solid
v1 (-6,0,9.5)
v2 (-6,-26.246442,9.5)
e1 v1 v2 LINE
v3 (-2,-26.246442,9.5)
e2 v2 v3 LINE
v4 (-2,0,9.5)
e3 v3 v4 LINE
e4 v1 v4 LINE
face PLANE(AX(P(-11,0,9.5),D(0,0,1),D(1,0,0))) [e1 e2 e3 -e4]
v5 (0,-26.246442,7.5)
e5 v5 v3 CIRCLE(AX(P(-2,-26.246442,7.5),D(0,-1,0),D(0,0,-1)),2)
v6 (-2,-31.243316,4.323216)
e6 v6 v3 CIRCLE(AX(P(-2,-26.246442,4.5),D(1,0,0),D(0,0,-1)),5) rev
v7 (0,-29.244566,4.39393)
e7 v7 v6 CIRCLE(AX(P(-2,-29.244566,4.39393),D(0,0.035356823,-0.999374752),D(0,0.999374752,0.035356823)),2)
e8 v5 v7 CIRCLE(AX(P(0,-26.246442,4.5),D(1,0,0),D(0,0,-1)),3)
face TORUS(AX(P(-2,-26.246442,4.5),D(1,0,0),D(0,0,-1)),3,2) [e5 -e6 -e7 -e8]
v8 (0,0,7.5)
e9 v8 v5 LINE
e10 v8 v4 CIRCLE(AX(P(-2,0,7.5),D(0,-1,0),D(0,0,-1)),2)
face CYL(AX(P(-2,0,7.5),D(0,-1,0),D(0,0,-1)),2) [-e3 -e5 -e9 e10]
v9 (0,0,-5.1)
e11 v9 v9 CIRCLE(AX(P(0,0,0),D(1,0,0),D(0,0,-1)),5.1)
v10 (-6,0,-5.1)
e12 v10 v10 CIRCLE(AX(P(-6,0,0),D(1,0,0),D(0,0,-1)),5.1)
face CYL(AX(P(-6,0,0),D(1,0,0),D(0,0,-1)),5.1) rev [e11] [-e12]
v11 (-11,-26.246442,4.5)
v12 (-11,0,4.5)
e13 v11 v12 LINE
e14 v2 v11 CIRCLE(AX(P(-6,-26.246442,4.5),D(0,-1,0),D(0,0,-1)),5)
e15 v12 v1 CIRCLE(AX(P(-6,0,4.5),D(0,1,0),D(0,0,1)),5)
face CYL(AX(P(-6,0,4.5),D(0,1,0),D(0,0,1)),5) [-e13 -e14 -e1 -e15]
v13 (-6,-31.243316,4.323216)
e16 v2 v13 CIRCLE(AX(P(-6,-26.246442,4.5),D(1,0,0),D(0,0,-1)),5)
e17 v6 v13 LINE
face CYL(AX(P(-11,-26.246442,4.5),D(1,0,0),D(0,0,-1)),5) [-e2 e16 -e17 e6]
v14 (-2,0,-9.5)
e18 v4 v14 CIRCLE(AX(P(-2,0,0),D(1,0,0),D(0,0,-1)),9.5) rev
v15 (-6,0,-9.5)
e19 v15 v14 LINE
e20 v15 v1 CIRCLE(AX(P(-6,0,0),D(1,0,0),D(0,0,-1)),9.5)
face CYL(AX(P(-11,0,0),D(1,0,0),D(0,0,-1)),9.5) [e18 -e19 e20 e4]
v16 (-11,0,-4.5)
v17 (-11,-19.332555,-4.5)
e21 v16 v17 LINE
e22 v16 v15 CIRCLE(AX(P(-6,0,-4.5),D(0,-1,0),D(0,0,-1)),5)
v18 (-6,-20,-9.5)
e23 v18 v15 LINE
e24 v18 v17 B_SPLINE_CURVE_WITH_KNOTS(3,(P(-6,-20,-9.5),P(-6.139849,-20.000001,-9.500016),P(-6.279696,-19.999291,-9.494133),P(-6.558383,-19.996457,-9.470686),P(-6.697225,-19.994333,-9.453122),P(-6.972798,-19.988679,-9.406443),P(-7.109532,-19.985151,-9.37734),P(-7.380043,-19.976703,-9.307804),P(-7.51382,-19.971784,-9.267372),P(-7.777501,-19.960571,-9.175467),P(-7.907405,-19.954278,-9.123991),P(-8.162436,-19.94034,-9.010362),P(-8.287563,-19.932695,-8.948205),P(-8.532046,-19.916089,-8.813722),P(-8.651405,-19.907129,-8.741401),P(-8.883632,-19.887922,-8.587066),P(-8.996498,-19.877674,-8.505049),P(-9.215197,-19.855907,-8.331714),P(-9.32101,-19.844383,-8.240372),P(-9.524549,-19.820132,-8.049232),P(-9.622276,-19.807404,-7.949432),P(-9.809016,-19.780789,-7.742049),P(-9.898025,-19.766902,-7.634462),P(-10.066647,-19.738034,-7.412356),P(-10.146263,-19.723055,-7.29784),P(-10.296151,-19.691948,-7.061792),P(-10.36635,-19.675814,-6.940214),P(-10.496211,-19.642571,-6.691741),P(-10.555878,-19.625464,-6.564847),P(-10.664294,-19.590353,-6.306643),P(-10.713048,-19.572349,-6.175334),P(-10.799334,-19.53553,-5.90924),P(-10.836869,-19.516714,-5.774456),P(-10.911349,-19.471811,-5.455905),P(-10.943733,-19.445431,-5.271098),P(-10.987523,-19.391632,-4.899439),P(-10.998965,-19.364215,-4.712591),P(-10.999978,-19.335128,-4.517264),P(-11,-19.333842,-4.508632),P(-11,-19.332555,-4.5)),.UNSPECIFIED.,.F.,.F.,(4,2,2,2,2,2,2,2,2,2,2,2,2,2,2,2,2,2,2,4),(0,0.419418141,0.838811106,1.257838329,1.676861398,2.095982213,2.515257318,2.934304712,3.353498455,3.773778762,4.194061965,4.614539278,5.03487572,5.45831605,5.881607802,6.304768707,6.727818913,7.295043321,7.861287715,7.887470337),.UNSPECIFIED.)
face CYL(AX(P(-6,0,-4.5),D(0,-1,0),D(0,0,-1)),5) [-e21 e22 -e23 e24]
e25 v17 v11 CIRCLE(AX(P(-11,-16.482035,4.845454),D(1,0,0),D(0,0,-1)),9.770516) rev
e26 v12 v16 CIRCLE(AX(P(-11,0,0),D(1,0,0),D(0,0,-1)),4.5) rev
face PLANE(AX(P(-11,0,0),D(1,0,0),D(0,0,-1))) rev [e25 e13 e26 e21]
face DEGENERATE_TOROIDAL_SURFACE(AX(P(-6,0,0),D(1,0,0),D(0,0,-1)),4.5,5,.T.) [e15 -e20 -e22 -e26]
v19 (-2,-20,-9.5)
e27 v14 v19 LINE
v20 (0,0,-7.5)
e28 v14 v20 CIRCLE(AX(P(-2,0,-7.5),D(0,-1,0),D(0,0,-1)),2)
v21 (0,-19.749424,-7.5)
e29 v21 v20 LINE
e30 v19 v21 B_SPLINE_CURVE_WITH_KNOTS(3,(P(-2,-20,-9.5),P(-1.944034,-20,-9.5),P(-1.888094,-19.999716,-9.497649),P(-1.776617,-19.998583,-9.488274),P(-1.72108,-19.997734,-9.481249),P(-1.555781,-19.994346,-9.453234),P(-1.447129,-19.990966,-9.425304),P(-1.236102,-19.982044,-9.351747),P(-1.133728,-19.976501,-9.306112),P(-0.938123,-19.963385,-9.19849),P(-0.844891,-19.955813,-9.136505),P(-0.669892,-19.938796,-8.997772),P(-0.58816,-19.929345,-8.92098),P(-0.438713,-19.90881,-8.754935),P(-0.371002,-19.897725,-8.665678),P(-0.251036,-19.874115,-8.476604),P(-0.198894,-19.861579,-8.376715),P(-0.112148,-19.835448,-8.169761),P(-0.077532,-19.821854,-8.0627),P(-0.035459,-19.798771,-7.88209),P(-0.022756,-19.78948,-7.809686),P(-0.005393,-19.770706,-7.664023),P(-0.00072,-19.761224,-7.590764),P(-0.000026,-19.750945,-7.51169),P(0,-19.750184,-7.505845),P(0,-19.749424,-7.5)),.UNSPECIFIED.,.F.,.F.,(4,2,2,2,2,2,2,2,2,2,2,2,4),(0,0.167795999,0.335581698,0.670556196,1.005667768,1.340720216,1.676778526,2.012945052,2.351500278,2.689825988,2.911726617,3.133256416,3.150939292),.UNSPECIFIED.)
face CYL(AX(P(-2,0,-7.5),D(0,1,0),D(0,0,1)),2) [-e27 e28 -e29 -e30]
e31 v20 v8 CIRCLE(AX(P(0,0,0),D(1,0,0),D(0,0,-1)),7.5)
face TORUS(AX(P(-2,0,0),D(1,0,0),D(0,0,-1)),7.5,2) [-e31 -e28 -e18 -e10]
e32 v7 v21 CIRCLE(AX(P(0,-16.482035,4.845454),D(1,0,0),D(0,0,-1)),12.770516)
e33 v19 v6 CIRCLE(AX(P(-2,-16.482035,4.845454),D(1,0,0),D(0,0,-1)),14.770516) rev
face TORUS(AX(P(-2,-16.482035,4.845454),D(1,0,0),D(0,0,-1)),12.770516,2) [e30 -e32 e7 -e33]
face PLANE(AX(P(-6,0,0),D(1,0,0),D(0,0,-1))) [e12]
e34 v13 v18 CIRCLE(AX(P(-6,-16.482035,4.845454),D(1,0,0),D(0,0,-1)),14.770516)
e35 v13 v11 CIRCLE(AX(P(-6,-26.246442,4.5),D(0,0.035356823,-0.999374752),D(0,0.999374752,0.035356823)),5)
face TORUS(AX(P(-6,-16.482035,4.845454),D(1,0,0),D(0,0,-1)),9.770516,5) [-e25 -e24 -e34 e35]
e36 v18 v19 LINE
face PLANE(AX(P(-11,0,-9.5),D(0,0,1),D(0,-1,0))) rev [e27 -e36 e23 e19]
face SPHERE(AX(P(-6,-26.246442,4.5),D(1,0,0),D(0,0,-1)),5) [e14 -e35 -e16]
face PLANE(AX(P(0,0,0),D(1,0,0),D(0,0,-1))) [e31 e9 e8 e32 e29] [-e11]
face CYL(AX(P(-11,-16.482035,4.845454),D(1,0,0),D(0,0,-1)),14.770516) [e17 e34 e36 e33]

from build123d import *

# Parameters (mm, degrees)
ESBO_O1_R                = 9.5
RESSALTO_EXTRUS_O1_DEPTH = 11
FILETE1_R                = 5
ESBO_O2_R                = 5.1000000000000005
CORTE_EXTRUS_O1_DEPTH    = 6
FILETE2_R                = 5
FILETE4_R                = 2


with BuildPart() as part:
    # Esboço1 → Ressalto-extrusão1 (new body)
    with BuildSketch(Plane(origin=(0, 0, 0), x_dir=(0, 0, -1), z_dir=(1, 0, 0))):
        Circle(ESBO_O1_R)
        with BuildLine():
            Line((9.500000000000002, -20), (9.5, 0))
            ThreePointArc((9.5, -2.33e-15), (-1.75e-15, -9.5), (-9.5, 1.16e-15))
            Line((-9.5, 0), (-9.5, -30.5))
            ThreePointArc((-9.5, -30.5), (2.298839010018332, -29.40980392289032), (9.5, -20))
        make_face()
    extrude(amount=-RESSALTO_EXTRUS_O1_DEPTH)

    # Filete1
    filete1_edges = [part.edges().sort_by_distance(p)[0] for p in [
        (-5.5, -30.5, 9.5),
    ]]
    fillet(filete1_edges, radius=FILETE1_R)

    # Esboço2 → Corte-extrusão1 (cut)
    with BuildSketch(Plane(origin=(0, 0, 0), x_dir=(0, 0, -1), z_dir=(1, 0, 0))):
        Circle(ESBO_O2_R)
    extrude(amount=-CORTE_EXTRUS_O1_DEPTH, mode=Mode.SUBTRACT)

    # Filete2
    # the kernel refuses this fillet: 5 mm, written as the material it takes off along each edge
    with BuildSketch(Plane(origin=(-11, -16.482034889709183, 4.845454403055449), x_dir=(0, -0.9993747520623889, -0.035356823107268454), z_dir=(0, -0.035356823107268454, 0.9993747520623889))) as filete2_piece_1:
        with BuildLine():
            CenterArc((14.770515920148714 - FILETE2_R, FILETE2_R), FILETE2_R, 270, 90)
            Line((14.770515920148714 - FILETE2_R, 0), (14.770515920148714 - FILETE2_R, -FILETE2_R * 0.02))
            Line((14.770515920148714 - FILETE2_R, -FILETE2_R * 0.02), (14.770515920148714 + FILETE2_R * 0.02, -FILETE2_R * 0.02))
            Line((14.770515920148714 + FILETE2_R * 0.02, -FILETE2_R * 0.02), (14.770515920148714 + FILETE2_R * 0.02, FILETE2_R))
            Line((14.770515920148714 + FILETE2_R * 0.02, FILETE2_R), (14.770515920148714, FILETE2_R))
        make_face()
    revolve(axis=Axis((-11, -16.482034889709183, 4.845454403055449), (1, 0, 0)), revolution_arc=93.59555420647537, mode=Mode.SUBTRACT)
    with BuildSketch(Plane(origin=(-11, -25, -9.500000000000002), x_dir=(1, 0, 0), z_dir=(0, 1, 9e-17))) as filete2_piece_2:
        with BuildLine():
            CenterArc((FILETE2_R, -FILETE2_R), FILETE2_R, 90, 90)
            Line((0, -FILETE2_R), (-FILETE2_R * 0.02, -FILETE2_R))
            Line((-FILETE2_R * 0.02, -FILETE2_R), (-FILETE2_R * 0.02, FILETE2_R * 0.02))
            Line((-FILETE2_R * 0.02, FILETE2_R * 0.02), (FILETE2_R, FILETE2_R * 0.02))
            Line((FILETE2_R, FILETE2_R * 0.02), (FILETE2_R, 0))
        make_face()
    extrude(amount=25, mode=Mode.SUBTRACT)
    with BuildSketch(Plane(origin=(-11, -26.246441814929426, 4.5), x_dir=(0, 0, 1), z_dir=(0, 1, 0))) as filete2_piece_3:
        with BuildLine():
            CenterArc((5 - FILETE2_R, FILETE2_R), FILETE2_R, 270, 90)
            Line((5 - FILETE2_R, 0), (5 - FILETE2_R, -FILETE2_R * 0.02))
            Line((5 - FILETE2_R, -FILETE2_R * 0.02), (5, -FILETE2_R * 0.02))
            Line((5, -FILETE2_R * 0.02), (5 + FILETE2_R * 0.02, 0))
            Line((5 + FILETE2_R * 0.02, 0), (5 + FILETE2_R * 0.02, FILETE2_R))
            Line((5 + FILETE2_R * 0.02, FILETE2_R), (5, FILETE2_R))
        make_face()
    revolve(axis=Axis((-11, -26.246441814929426, 4.5), (1, 0, 0)), revolution_arc=92.02621905507084, mode=Mode.SUBTRACT)
    with BuildSketch(Plane(origin=(-11, 0, 0), x_dir=(0, 0, -1), z_dir=(0, -1, 0))) as filete2_piece_4:
        with BuildLine():
            CenterArc((9.5 - FILETE2_R, FILETE2_R), FILETE2_R, 270, 90)
            Line((9.5 - FILETE2_R, 0), (9.5 - FILETE2_R, -FILETE2_R * 0.02))
            Line((9.5 - FILETE2_R, -FILETE2_R * 0.02), (9.5 + FILETE2_R * 0.02, -FILETE2_R * 0.02))
            Line((9.5 + FILETE2_R * 0.02, -FILETE2_R * 0.02), (9.5 + FILETE2_R * 0.02, FILETE2_R))
            Line((9.5 + FILETE2_R * 0.02, FILETE2_R), (9.5, FILETE2_R))
        make_face()
    revolve(axis=Axis((-11, 0, 0), (1, 0, 0)), revolution_arc=180, mode=Mode.SUBTRACT)
    with BuildSketch(Plane(origin=(-11, 0, 9.5), x_dir=(1, 0, 0), z_dir=(0, -1, 0))) as filete2_piece_5:
        with BuildLine():
            CenterArc((FILETE2_R, -FILETE2_R), FILETE2_R, 90, 90)
            Line((0, -FILETE2_R), (-FILETE2_R * 0.02, -FILETE2_R))
            Line((-FILETE2_R * 0.02, -FILETE2_R), (-FILETE2_R * 0.02, FILETE2_R * 0.02))
            Line((-FILETE2_R * 0.02, FILETE2_R * 0.02), (FILETE2_R, FILETE2_R * 0.02))
            Line((FILETE2_R, FILETE2_R * 0.02), (FILETE2_R, 0))
        make_face()
    extrude(amount=26.246441814929426, mode=Mode.SUBTRACT)

    # Filete4
    # the kernel refuses this fillet: 2 mm, written as the material it takes off along each edge
    with BuildSketch(Plane(origin=(0, -26.246441814929426, 4.5), x_dir=(0, 0, 1), z_dir=(0, 1, 0))) as filete4_piece_1:
        with BuildLine():
            CenterArc((5 - FILETE4_R, -FILETE4_R), FILETE4_R, 6.36e-15, 90)
            Line((5, -FILETE4_R), (5, 0))
            Line((5, 0), (5 - FILETE4_R, 0))
        make_face()
    revolve(axis=Axis((0, -26.246441814929426, 4.5), (1, 0, 0)), revolution_arc=92.02621905507084, mode=Mode.SUBTRACT)
    with BuildSketch(Plane(origin=(0, -25, -9.500000000000002), x_dir=(0, -9e-17, 1), z_dir=(0, 1, 9e-17))) as filete4_piece_2:
        with BuildLine():
            CenterArc((FILETE4_R, -FILETE4_R), FILETE4_R, 90, 90)
            Line((0, -FILETE4_R), (0, 0))
            Line((0, 0), (FILETE4_R, 0))
        make_face()
    extrude(amount=25, mode=Mode.SUBTRACT)
    with BuildSketch(Plane(origin=(0, -16.482034889709183, 4.845454403055449), x_dir=(0, -0.9993747520623889, -0.035356823107268454), z_dir=(0, -0.035356823107268454, 0.9993747520623889))) as filete4_piece_3:
        with BuildLine():
            CenterArc((14.770515920148714 - FILETE4_R, -FILETE4_R), FILETE4_R, 6.36e-15, 90)
            Line((14.770515920148714, -FILETE4_R), (14.770515920148714, 0))
            Line((14.770515920148714, 0), (14.770515920148714 - FILETE4_R, 0))
        make_face()
    revolve(axis=Axis((0, -16.482034889709183, 4.845454403055449), (1, 0, 0)), revolution_arc=93.59555420647538, mode=Mode.SUBTRACT)
    with BuildSketch(Plane(origin=(0, 0, 9.5), x_dir=(0, 0, -1), z_dir=(0, -1, 0))) as filete4_piece_4:
        with BuildLine():
            CenterArc((FILETE4_R, -FILETE4_R), FILETE4_R, 90, 90)
            Line((0, -FILETE4_R), (0, 0))
            Line((0, 0), (FILETE4_R, 0))
        make_face()
    extrude(amount=26.246441814929426, mode=Mode.SUBTRACT)
    with BuildSketch(Plane(origin=(0, 0, 0), x_dir=(0, 0, -1), z_dir=(0, -1, 0))) as filete4_piece_5:
        with BuildLine():
            CenterArc((9.5 - FILETE4_R, -FILETE4_R), FILETE4_R, 6.36e-15, 90)
            Line((9.5, -FILETE4_R), (9.5, 0))
            Line((9.5, 0), (9.5 - FILETE4_R, 0))
        make_face()
    revolve(axis=Axis((0, 0, 0), (1, 0, 0)), revolution_arc=180, mode=Mode.SUBTRACT)


solid = part.part
